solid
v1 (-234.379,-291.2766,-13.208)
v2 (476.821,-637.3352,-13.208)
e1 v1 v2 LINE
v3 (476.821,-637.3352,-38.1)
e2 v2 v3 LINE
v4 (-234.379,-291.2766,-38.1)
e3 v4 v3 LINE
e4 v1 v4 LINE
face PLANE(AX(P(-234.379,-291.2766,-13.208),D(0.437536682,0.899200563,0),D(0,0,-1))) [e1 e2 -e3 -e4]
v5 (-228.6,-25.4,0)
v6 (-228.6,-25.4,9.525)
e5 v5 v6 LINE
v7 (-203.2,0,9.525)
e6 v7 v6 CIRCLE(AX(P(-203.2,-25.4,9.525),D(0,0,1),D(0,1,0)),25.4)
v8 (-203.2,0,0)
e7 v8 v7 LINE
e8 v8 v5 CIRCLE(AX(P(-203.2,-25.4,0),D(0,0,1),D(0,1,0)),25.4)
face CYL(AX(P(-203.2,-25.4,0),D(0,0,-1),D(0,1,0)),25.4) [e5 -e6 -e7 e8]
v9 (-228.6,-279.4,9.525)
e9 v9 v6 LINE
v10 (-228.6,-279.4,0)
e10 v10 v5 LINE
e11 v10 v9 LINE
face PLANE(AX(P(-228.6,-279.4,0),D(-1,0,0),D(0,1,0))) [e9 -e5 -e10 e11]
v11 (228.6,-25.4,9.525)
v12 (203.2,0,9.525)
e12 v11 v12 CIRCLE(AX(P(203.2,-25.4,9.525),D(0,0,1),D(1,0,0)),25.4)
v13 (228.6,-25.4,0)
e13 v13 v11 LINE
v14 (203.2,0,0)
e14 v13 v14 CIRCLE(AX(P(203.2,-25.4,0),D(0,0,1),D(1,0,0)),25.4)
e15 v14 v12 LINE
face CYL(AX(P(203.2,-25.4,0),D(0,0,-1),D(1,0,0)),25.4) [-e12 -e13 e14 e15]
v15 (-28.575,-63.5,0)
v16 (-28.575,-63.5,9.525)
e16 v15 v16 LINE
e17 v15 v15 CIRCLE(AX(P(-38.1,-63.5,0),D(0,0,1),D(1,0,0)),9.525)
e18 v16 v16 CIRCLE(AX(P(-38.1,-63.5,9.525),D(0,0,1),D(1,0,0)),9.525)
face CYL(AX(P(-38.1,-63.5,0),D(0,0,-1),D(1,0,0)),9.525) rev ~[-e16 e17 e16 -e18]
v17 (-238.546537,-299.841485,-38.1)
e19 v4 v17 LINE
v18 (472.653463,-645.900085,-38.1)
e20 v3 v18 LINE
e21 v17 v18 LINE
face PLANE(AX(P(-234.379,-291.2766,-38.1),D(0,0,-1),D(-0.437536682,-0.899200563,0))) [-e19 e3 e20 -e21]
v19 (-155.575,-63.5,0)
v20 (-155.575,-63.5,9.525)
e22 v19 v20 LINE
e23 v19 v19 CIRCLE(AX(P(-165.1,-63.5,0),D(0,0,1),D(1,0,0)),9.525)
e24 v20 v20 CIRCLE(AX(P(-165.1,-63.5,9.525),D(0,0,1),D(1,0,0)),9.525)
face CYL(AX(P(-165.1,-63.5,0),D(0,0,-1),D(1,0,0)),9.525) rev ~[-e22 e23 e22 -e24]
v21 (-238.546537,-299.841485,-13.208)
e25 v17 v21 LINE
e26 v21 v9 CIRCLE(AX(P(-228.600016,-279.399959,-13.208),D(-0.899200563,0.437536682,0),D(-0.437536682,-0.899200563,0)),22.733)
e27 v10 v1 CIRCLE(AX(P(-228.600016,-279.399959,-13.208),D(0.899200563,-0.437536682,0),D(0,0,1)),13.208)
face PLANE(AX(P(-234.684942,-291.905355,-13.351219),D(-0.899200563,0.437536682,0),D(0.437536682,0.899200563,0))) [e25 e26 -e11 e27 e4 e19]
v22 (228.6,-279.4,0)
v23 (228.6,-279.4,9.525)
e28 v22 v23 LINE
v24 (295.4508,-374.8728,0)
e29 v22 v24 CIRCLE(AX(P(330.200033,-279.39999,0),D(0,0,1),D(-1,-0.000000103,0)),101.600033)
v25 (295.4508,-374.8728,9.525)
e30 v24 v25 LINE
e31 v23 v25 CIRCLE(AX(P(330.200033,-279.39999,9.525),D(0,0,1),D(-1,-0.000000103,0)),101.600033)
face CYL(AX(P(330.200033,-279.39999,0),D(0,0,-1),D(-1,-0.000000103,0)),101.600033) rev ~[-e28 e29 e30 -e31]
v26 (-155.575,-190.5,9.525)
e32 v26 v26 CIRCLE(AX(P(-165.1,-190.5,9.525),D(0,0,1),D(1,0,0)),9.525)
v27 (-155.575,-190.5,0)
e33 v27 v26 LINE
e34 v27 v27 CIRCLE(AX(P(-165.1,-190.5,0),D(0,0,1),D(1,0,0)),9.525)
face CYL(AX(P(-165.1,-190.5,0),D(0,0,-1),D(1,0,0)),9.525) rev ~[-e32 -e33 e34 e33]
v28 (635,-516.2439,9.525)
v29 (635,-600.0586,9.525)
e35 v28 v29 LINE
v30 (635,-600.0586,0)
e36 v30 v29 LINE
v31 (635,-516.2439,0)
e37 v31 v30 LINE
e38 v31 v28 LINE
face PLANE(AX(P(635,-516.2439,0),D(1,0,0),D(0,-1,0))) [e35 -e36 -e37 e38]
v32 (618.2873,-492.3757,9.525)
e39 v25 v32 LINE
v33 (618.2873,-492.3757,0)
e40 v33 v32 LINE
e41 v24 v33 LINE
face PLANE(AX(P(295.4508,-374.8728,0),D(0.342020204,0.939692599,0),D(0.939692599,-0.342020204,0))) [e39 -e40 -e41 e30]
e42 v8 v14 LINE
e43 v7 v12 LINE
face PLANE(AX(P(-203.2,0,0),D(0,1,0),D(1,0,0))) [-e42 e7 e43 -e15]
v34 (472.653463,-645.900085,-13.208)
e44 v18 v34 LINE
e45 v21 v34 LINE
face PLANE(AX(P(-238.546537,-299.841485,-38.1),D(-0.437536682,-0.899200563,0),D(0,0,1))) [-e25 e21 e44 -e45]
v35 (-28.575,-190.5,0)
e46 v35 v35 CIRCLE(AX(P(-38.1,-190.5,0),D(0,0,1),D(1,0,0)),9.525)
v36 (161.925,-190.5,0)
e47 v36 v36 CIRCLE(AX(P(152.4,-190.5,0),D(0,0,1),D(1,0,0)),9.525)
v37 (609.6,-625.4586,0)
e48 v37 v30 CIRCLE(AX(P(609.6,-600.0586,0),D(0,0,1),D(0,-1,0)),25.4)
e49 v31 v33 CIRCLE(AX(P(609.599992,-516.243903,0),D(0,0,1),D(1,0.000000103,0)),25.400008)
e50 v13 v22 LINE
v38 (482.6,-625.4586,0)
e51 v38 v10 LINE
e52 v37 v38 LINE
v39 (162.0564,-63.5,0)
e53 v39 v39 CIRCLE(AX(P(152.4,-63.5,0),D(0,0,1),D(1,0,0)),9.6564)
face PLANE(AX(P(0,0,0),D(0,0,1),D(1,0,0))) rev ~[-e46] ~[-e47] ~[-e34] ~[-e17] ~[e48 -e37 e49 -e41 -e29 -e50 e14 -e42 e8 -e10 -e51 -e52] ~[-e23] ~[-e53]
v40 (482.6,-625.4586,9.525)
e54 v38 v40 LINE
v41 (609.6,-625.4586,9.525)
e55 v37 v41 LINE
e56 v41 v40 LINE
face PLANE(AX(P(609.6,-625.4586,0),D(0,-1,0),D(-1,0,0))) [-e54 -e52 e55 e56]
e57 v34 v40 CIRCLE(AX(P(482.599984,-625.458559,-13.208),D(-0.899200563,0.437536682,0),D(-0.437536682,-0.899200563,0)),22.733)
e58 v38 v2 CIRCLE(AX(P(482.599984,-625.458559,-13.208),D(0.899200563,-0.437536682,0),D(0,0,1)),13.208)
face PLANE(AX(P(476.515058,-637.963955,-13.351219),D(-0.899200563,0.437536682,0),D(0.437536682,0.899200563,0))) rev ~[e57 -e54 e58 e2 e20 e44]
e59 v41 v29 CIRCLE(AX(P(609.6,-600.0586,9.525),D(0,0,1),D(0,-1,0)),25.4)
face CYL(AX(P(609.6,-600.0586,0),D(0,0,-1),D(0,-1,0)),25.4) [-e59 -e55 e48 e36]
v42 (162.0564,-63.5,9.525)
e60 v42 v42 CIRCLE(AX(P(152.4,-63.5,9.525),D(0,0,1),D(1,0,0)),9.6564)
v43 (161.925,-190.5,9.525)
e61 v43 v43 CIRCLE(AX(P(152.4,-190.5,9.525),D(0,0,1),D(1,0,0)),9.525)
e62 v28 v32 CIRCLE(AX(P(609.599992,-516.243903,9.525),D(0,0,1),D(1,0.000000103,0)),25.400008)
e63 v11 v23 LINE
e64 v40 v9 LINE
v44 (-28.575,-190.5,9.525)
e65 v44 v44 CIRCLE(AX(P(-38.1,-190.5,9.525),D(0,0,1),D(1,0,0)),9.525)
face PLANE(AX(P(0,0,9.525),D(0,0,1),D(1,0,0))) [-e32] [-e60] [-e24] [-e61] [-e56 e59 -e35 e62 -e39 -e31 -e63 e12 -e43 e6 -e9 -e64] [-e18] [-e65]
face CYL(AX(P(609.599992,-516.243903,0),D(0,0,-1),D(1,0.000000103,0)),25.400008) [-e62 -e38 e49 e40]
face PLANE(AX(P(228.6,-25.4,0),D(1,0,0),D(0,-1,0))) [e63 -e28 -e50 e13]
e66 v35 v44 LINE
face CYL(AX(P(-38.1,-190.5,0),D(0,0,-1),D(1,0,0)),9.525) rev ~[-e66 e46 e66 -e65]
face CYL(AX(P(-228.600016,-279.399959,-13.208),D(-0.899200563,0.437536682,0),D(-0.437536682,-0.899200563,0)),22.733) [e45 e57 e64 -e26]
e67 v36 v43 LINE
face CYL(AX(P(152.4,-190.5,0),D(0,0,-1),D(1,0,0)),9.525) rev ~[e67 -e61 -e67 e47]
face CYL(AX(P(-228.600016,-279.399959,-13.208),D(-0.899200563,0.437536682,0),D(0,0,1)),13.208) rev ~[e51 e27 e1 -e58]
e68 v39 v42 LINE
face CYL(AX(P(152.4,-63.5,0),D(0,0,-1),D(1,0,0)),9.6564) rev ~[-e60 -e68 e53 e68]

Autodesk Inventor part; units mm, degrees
ref_plane "YZ Plane" through (0, 0, 0) normal (1, 0, 0) x (0, 1, 0)
ref_plane "XZ Plane" through (0, 0, 0) normal (0, 1, 0) x (-1, 0, 0)
ref_plane "XY Plane" through (0, 0, 0) normal (0, 0, 1) x (1, 0, 0)
sketch "Sketch1" plane through (0, 0, 0) normal (0, 0, 1) x (1, 0, 0)
  line L0 (-203.2, 0) -> (203.2, 0)
  line L1 (-228.6, -279.4) -> (-228.6, -25.4)
  line L2 (228.6, -25.4) -> (228.6, -279.4)
  line L3 (295.4508, -374.8728) -> (618.2873, -492.3757)
  line L4 (635, -516.2439) -> (635, -600.0586)
  line L5 (609.6, -625.4586) -> (482.6, -625.4586)
  line L6 (482.6, -625.4586) -> (-228.6, -279.4)
  arc A0 (228.6, -279.4) -> (295.4508, -374.8728) centre (330.2, -279.4) ccw
  line L7 (-165.1, -190.5) -> (-38.1, -190.5) construction
  line L8 (-38.1, -190.5) -> (-38.1, -63.5) construction
  line L9 (-38.1, -63.5) -> (-165.1, -63.5) construction
  line L10 (-165.1, -63.5) -> (-165.1, -190.5) construction
  line L11 (-165.1, -190.5) -> (-38.1, -63.5) construction
  line L12 (-38.1, -190.5) -> (-165.1, -63.5) construction
  circle A1 centre (-165.1, -63.5) radius 9.525
  circle A2 centre (-38.1, -63.5) radius 9.525
  circle A3 centre (-38.1, -190.5) radius 9.525
  circle A4 centre (-165.1, -190.5) radius 9.525
  circle A5 centre (152.4, -63.5) radius 9.6564
  circle A6 centre (152.4, -190.5) radius 9.525
  arc A7 (635, -516.2439) -> (618.2873, -492.3757) centre (609.6, -516.2439) ccw
  arc A8 (609.6, -625.4586) -> (635, -600.0586) centre (609.6, -600.0586) ccw
  arc A9 (228.6, -25.4) -> (203.2, 0) centre (203.2, -25.4) ccw
  arc A10 (-203.2, 0) -> (-228.6, -25.4) centre (-203.2, -25.4) ccw
  point P0 (0, 0)
  point P1 (-228.6, 0)
  point P2 (228.6, 0)
  point P3 (0, 0)
  point P4 (635, -498.4586)
  point P5 (635, -625.4586)
  point P6 (-101.6, -127)
  point P7 (635, -558.1512)
  point P8 (546.1, -625.4586)
  dimension "d0" = 127
  dimension "d1" = 457.2
  dimension "d2" = 101.6
  dimension "d3" = 110
  dimension "d5" = 152.4
  dimension "d7" = 19.05
  dimension "d8" = 127
  dimension "d9" = 127
  dimension "d10" = 63.5
  dimension "d11" = 63.5
  dimension "d12" = 76.2
  dimension "d13" = 635
  dimension "d14" = 25.4
  dimension "d16" = 254
extrude "Plate1" add sketch "Sketch1" along normal blind 9.525
sketch "Sketch2" plane through (-234.379, -291.2766, -13.208) normal (-0.4375367, -0.8992006, 0) x (0.8992006, -0.4375367, 0)
  line L0 (790.9248, 0) -> (0, 0)
  line L1 (0, 0) -> (0, -24.892)
  line L2 (0, -24.892) -> (790.9248, -24.892)
  line L3 (790.9248, -24.892) -> (790.9248, 0)
edge flange "Flange1" height 38.1 angle 90 thickness 9.525 bend radius 13.208 thickness toward (-0.4375367, -0.8992006, 0) relief tear relief width 9.525 relief depth 4.7625 edges at (127, -452.4293, 0) wall of the first edge with corners at (476.821, -637.3352, -13.208) (-234.379, -291.2766, -13.208) (-234.379, -291.2766, -38.1) (476.821, -637.3352, -38.1)
bend "Bend1"
corner "Corner1"
equation "\"d15\" = Thickness"
equation "\"d19\" = BendReliefWidth"
equation "\"d20\" = BendReliefDepth"
equation "\"d21\" = MinimumRemnant"
equation "\"d22\" = TransitionRadius"
equation "\"d25\" = BendRadius"
equation "\"d26\" = CornerReliefSize"
equation "\"d27\" = GapSize"
equation "\"d28\" = JacobiRadiusSize"
equation "\"BendReliefWidth\" = Thickness"
equation "\"BendReliefDepth\" = 0.5 * Thickness"
equation "\"CornerReliefSize\" = 4 * Thickness"
equation "\"MinimumRemnant\" = 2 * Thickness"
equation "\"TransitionRadius\" = BendRadius"
equation "\"JacobiRadiusSize\" = Thickness"
equation "\"GapSize\" = Thickness"
equation "\"Thickness\" = 9.525"
equation "\"BendRadius\" = 13.208"
properties part number "Model-2_Sheet-LH" material "SS304"
